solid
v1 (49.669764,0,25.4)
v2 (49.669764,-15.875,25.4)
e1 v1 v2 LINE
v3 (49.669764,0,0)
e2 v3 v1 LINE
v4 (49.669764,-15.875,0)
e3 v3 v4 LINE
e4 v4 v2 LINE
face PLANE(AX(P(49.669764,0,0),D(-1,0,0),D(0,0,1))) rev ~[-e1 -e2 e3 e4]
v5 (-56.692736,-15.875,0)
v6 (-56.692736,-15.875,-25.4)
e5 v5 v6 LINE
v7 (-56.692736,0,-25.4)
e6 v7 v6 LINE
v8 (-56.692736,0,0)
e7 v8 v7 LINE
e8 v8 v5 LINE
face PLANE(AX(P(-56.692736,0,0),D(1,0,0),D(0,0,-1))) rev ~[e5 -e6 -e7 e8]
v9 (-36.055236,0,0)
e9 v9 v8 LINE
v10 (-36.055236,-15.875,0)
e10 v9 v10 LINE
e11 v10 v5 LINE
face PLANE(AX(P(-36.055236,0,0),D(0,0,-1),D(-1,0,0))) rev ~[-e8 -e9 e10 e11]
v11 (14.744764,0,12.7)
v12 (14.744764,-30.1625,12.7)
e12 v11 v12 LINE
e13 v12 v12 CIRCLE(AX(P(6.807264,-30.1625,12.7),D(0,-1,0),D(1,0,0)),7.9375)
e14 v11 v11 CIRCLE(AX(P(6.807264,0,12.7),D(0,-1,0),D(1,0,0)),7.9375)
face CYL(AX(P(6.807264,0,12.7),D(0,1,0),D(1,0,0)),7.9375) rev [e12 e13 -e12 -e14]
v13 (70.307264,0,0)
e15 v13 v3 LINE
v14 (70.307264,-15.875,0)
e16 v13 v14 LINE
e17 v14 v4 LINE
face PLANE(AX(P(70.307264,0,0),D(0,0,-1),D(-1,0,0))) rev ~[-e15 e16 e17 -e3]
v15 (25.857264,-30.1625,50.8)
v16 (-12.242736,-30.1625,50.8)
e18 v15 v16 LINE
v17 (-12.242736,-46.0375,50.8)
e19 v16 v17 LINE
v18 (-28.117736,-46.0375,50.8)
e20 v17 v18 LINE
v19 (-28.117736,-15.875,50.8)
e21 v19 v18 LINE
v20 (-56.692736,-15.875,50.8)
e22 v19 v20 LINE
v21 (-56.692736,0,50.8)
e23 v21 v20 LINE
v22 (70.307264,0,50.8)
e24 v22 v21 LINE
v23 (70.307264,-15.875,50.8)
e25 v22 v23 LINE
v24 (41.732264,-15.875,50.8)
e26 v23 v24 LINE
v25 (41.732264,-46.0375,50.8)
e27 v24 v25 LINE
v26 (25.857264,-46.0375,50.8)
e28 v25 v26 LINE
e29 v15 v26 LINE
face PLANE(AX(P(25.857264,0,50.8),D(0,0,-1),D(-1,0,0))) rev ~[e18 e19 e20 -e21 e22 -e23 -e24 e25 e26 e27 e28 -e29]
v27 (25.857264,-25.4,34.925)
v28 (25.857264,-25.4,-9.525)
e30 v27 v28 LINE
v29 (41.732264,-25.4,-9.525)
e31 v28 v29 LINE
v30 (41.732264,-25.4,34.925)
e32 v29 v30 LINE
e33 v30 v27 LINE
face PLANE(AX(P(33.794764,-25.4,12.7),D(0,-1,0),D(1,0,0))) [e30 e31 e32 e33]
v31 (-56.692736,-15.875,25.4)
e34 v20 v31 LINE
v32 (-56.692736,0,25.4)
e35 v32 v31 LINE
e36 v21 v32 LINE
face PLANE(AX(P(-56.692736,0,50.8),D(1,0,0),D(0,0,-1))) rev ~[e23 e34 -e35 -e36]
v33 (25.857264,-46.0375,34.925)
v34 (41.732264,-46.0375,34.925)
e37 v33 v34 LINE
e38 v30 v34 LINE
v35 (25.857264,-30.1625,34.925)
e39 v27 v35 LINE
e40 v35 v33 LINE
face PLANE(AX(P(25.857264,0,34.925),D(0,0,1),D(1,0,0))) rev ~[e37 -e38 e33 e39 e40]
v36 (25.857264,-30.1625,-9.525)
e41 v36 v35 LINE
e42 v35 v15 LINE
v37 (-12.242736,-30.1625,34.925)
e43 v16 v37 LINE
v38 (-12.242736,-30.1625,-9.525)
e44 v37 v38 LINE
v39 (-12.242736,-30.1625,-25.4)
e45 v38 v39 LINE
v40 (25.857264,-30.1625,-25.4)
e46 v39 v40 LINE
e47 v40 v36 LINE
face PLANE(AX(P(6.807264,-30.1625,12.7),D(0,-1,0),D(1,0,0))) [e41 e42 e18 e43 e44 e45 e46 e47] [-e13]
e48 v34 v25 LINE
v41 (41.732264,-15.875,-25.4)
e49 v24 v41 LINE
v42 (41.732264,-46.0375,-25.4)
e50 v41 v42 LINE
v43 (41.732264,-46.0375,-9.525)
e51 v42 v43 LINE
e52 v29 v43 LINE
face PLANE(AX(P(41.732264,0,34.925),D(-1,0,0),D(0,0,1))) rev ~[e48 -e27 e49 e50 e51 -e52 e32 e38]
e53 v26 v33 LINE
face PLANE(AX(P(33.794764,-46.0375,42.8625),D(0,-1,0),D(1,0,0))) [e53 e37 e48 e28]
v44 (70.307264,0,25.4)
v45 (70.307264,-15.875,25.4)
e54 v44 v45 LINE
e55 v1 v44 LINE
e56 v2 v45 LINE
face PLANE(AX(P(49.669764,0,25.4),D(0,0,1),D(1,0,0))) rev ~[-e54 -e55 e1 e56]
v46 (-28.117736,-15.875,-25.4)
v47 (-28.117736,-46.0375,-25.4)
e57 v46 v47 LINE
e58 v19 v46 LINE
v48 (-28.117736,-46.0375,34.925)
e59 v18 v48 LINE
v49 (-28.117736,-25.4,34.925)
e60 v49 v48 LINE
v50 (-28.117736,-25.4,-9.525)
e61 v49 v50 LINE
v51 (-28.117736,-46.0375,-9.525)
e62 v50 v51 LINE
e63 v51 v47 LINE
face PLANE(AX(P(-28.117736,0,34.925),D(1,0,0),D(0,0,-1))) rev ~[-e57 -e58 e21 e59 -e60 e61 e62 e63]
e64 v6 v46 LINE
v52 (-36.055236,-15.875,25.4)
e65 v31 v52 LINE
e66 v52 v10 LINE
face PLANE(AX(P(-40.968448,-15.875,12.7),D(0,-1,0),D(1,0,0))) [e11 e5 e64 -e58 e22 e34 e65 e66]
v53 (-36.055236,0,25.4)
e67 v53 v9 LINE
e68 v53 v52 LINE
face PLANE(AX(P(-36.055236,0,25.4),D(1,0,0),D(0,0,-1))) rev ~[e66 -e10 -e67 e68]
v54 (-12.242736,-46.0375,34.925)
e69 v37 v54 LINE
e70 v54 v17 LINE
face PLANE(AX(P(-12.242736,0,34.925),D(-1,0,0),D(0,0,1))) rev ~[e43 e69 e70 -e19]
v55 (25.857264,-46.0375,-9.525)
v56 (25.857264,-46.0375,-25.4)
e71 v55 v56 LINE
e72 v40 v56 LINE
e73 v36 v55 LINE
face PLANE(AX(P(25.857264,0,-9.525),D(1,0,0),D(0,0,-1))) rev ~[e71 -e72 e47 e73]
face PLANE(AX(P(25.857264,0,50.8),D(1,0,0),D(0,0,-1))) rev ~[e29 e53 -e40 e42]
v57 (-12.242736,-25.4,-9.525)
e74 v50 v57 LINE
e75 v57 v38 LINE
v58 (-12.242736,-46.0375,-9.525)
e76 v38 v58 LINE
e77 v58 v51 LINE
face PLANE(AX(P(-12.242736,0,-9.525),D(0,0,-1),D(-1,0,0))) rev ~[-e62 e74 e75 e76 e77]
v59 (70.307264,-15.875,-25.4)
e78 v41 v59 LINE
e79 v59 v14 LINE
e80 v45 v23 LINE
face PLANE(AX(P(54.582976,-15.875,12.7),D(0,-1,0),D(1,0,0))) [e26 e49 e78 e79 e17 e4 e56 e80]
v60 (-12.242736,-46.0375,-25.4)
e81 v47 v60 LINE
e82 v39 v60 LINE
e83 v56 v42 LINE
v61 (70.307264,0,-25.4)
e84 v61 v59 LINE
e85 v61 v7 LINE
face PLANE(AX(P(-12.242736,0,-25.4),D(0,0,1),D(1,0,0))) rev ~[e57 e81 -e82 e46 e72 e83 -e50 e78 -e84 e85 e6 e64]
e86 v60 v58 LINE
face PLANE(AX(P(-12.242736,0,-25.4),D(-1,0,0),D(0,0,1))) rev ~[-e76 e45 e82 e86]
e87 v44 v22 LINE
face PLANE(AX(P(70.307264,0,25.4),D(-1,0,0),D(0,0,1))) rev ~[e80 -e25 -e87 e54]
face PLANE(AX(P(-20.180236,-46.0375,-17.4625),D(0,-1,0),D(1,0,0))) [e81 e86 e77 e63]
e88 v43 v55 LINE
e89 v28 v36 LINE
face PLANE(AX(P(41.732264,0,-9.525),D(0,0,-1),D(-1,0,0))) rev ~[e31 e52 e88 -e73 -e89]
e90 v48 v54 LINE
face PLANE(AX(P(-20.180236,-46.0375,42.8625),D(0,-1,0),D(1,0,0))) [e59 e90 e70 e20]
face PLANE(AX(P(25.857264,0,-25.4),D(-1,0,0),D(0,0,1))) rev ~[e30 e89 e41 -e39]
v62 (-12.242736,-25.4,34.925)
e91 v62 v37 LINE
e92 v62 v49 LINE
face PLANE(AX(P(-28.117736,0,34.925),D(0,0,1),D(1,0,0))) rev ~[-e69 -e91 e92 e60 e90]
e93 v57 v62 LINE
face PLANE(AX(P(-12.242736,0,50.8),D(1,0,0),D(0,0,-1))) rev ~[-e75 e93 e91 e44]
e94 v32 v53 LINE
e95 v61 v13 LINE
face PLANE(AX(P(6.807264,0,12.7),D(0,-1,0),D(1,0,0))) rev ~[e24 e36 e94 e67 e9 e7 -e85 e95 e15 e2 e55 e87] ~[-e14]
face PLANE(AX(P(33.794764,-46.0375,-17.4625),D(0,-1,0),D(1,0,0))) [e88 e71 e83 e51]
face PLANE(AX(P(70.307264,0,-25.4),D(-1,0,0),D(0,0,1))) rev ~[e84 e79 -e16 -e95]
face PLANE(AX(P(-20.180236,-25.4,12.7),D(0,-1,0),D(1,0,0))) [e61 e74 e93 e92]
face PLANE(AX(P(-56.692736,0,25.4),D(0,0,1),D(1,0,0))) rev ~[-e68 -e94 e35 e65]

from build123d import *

# Parameters (mm, degrees)
F1_DEPTH = 15.875
F2_DEPTH = 46.0375
F0_R     = 7.9375
F3_DEPTH = 30.1625
F4_DEPTH = 25.4


with BuildPart() as f1:
    # F0 (on Front) → F1 (new body)
    with BuildSketch(Plane.XZ):
        Polygon((-28.1177360594, 50.8), (-56.6927360594, 50.8), (-56.6927360594, 25.4), (-36.0552360594, 25.4), (-36.0552360594, 0), (-56.6927360594, 0), (-56.6927360594, -25.4), (-28.1177360594, -25.4), (-28.1177360594, -9.525), (-28.1177360594, 34.925), align=None)
    extrude(amount=F1_DEPTH)

    # F0 (on Front) → F2 (join)
    with BuildSketch(Plane.XZ):
        Polygon((-12.2427360594, 50.8), (-28.1177360594, 50.8), (-28.1177360594, 34.925), (-20.1802360594, 34.925), (-12.2427360594, 34.925), align=None)
        Polygon((-20.1802360594, -9.525), (-28.1177360594, -9.525), (-28.1177360594, -25.4), (-12.2427360594, -25.4), (-12.2427360594, -9.525), align=None)
    extrude(amount=F2_DEPTH)



with BuildPart() as f1b:
    # F0 (on Front) → F1, piece 2 (new body)
    with BuildSketch(Plane.XZ):
        Polygon((70.3072639406, 50.8), (41.7322639406, 50.8), (41.7322639406, 34.925), (41.7322639406, -9.525), (41.7322639406, -25.4), (70.3072639406, -25.4), (70.3072639406, 0), (49.6697639406, 0), (49.6697639406, 25.4), (70.3072639406, 25.4), align=None)
    extrude(amount=F1_DEPTH)

    # F0 (on Front) → F2, piece 2 (join)
    with BuildSketch(Plane.XZ):
        Polygon((41.7322639406, 50.8), (25.8572639406, 50.8), (25.8572639406, 34.925), (33.7947639406, 34.925), (41.7322639406, 34.925), align=None)
        Polygon((33.7947639406, -9.525), (25.8572639406, -9.525), (25.8572639406, -25.4), (41.7322639406, -25.4), (41.7322639406, -9.525), align=None)
    extrude(amount=F2_DEPTH)


with BuildPart() as f1_1:
    add(f1.part)

    add(f1b.part)  # F3 merges F1b
    # F0 (on Front) → F3 (join)
    with BuildSketch(Plane.XZ):
        Polygon((25.8572639406, 50.8), (-12.2427360594, 50.8), (-12.2427360594, 34.925), (-12.2427360594, -9.525), (-12.2427360594, -25.4), (25.8572639406, -25.4), (25.8572639406, -9.525), (25.8572639406, 34.925), align=None)
        with Locations((6.8072639406, 12.7)):
            Circle(F0_R, mode=Mode.SUBTRACT)
    extrude(amount=F3_DEPTH)

    # F0 (on Front) → F4 (join)
    with BuildSketch(Plane.XZ):
        Polygon((-20.1802360594, 34.925), (-28.1177360594, 34.925), (-28.1177360594, -9.525), (-20.1802360594, -9.525), (-12.2427360594, -9.525), (-12.2427360594, 34.925), align=None)
        Polygon((33.7947639406, 34.925), (25.8572639406, 34.925), (25.8572639406, -9.525), (33.7947639406, -9.525), (41.7322639406, -9.525), (41.7322639406, 34.925), align=None)
    extrude(amount=F4_DEPTH)


solid = f1_1.part
